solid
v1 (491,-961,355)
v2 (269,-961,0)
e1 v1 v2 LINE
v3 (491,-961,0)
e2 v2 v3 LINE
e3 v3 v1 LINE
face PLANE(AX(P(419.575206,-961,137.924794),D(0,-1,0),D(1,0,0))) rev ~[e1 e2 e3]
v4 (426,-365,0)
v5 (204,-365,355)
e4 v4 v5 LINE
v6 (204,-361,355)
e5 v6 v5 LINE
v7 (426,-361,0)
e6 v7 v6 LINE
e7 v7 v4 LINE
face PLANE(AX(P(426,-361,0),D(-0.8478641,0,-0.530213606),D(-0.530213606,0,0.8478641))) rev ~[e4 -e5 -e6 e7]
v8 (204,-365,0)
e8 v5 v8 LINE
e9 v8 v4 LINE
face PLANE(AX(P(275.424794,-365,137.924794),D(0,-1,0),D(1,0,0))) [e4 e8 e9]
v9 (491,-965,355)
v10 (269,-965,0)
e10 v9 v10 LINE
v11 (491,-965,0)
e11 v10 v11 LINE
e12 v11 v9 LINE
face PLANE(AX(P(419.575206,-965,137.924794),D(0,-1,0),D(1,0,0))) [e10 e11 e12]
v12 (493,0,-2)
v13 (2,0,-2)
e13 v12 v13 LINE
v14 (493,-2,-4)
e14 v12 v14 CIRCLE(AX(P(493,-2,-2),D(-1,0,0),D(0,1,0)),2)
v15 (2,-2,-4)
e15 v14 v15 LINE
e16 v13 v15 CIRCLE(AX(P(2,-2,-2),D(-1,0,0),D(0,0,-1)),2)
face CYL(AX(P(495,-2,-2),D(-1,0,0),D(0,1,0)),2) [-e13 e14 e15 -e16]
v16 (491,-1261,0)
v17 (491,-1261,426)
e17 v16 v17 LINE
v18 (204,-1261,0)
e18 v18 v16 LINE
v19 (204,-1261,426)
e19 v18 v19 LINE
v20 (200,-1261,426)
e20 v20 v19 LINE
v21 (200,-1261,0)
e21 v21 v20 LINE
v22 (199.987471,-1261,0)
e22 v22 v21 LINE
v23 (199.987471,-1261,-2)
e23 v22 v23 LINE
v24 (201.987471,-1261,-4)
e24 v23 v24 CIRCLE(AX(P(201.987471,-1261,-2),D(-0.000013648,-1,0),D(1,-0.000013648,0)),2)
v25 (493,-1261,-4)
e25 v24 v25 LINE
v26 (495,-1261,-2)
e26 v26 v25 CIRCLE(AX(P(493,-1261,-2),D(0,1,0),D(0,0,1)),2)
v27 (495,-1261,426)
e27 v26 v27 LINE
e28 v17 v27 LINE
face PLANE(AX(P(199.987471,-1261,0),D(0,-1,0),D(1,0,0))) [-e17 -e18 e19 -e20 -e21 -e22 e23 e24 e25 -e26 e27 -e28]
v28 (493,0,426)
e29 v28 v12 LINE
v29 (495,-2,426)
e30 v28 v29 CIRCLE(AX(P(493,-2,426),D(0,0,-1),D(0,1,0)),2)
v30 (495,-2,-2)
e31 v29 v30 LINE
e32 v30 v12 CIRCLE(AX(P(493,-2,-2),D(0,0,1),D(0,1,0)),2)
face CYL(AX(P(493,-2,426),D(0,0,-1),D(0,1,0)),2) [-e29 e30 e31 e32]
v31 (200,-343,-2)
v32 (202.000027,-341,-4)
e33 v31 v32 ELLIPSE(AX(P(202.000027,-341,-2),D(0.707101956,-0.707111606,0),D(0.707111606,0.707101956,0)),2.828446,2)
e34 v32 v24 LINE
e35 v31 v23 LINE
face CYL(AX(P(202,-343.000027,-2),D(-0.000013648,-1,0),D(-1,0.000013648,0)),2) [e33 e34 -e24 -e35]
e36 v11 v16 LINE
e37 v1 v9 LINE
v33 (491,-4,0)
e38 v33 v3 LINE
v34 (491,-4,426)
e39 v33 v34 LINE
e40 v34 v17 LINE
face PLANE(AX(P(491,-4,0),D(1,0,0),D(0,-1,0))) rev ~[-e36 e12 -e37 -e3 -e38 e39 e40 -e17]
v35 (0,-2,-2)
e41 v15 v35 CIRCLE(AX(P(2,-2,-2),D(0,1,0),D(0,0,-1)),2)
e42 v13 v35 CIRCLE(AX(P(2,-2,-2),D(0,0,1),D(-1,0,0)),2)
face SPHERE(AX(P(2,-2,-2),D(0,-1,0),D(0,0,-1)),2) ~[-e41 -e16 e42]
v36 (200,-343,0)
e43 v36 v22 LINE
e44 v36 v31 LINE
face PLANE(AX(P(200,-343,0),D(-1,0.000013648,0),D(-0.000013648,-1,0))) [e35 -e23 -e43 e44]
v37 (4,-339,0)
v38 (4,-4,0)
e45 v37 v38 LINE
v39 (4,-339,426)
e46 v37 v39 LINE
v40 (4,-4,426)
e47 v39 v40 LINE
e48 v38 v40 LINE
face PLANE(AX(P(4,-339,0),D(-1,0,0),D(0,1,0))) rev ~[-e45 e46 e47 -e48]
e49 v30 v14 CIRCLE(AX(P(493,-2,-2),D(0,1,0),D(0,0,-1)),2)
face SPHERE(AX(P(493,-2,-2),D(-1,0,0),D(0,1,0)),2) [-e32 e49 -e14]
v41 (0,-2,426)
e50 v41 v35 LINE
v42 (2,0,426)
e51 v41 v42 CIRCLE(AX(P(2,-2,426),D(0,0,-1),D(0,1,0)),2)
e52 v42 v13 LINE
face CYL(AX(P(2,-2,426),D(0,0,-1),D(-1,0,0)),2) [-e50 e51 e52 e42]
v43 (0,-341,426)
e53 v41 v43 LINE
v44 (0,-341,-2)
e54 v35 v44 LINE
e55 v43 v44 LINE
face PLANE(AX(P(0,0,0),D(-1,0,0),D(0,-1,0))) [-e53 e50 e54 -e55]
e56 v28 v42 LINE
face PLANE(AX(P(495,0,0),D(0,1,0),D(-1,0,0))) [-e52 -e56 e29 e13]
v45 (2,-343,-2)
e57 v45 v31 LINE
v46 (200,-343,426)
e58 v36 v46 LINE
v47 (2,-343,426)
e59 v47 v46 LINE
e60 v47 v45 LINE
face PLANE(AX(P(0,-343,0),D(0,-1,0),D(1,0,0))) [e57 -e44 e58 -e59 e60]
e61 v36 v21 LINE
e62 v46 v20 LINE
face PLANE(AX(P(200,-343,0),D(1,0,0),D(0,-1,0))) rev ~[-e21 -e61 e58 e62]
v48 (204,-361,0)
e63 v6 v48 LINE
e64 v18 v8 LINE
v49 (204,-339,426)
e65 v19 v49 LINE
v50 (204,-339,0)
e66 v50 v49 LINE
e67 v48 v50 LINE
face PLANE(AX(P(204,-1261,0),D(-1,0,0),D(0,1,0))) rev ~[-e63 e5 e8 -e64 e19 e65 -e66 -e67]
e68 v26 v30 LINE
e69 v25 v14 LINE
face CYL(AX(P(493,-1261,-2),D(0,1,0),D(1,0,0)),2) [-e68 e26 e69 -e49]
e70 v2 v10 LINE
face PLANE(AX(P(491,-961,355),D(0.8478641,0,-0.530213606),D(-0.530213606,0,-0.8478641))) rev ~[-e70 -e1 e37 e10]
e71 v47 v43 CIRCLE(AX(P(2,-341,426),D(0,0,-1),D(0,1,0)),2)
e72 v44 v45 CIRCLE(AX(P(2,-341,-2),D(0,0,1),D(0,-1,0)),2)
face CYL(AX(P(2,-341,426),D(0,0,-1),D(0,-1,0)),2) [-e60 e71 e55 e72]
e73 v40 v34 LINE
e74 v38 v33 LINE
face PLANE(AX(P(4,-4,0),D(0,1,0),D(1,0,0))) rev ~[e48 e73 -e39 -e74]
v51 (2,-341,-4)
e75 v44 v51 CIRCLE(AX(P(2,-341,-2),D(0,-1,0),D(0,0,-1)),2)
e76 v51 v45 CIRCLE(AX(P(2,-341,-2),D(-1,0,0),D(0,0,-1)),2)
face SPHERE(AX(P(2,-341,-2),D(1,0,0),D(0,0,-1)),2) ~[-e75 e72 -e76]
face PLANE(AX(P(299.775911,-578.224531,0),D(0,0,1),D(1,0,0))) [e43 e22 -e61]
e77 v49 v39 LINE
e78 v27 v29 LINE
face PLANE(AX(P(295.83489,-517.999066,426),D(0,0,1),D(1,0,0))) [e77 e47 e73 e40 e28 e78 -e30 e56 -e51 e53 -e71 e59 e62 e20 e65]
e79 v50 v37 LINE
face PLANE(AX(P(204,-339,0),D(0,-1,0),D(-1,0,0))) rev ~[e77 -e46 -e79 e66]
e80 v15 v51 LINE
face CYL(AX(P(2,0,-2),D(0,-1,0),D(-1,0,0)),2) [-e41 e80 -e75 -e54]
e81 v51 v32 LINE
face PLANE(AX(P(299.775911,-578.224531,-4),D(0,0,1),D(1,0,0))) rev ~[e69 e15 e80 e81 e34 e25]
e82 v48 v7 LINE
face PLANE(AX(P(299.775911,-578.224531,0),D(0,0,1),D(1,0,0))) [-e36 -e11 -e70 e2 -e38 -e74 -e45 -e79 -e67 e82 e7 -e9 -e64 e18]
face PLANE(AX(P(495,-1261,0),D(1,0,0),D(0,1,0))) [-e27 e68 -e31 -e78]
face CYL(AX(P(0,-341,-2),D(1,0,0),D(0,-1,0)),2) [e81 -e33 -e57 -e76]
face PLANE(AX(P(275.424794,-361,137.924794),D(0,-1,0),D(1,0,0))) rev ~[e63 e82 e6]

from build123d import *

# Parameters (mm, degrees)
F1_DEPTH  = 426
F3_DEPTH  = 4
F4_R      = 2
F7_DEPTH  = 4
F10_DEPTH = 4


# Not quite as in the source:
# - a feature names something its author has since deleted; it is built from what else it names


with BuildPart() as f1:
    # F0 (on Top) → F1 (new body)
    with BuildSketch(Plane.XY):
        Polygon((495, 0), (0, 0), (0, -343), (200, -343), (200, -1261), (204, -1261), (204, -339), (4, -339), (4, -4), (491, -4), (491, -1261), (495, -1261), align=None)
    extrude(amount=F1_DEPTH)

    # F2 (on Top) → F3 (join)
    with BuildSketch(Plane.XY):
        Polygon((0, -343), (200, -343), (199.9874711037, -1261), (495, -1261), (495, 0), (0, 0), align=None)
    extrude(amount=-F3_DEPTH)

    # F4
    f4_edges = [f1.edges().sort_by_distance(p)[0] for p in [
        (100, -343, -4),
        (0, -171.5, -4),
        (247.5, 0, -4),
        (0, -343, 211),
        (0, 0, 211),
        (495, 0, 211),
        (199.993736, -802, -4),
        (495, -630.5, -4),
    ]]
    fillet(f4_edges, radius=F4_R)

    # F6 (on offset) → F7 (join)
    with BuildSketch(Plane.XZ.offset(961)):
        Polygon((269, 0), (491, 0), (491, 355), align=None)
    extrude(amount=F7_DEPTH)

    # F9 (on offset) → F10 (join)
    with BuildSketch(Plane.XZ.offset(361)):
        Polygon((204, 355), (204, 0), (426, 0), align=None)
    extrude(amount=F10_DEPTH)


solid = f1.part
